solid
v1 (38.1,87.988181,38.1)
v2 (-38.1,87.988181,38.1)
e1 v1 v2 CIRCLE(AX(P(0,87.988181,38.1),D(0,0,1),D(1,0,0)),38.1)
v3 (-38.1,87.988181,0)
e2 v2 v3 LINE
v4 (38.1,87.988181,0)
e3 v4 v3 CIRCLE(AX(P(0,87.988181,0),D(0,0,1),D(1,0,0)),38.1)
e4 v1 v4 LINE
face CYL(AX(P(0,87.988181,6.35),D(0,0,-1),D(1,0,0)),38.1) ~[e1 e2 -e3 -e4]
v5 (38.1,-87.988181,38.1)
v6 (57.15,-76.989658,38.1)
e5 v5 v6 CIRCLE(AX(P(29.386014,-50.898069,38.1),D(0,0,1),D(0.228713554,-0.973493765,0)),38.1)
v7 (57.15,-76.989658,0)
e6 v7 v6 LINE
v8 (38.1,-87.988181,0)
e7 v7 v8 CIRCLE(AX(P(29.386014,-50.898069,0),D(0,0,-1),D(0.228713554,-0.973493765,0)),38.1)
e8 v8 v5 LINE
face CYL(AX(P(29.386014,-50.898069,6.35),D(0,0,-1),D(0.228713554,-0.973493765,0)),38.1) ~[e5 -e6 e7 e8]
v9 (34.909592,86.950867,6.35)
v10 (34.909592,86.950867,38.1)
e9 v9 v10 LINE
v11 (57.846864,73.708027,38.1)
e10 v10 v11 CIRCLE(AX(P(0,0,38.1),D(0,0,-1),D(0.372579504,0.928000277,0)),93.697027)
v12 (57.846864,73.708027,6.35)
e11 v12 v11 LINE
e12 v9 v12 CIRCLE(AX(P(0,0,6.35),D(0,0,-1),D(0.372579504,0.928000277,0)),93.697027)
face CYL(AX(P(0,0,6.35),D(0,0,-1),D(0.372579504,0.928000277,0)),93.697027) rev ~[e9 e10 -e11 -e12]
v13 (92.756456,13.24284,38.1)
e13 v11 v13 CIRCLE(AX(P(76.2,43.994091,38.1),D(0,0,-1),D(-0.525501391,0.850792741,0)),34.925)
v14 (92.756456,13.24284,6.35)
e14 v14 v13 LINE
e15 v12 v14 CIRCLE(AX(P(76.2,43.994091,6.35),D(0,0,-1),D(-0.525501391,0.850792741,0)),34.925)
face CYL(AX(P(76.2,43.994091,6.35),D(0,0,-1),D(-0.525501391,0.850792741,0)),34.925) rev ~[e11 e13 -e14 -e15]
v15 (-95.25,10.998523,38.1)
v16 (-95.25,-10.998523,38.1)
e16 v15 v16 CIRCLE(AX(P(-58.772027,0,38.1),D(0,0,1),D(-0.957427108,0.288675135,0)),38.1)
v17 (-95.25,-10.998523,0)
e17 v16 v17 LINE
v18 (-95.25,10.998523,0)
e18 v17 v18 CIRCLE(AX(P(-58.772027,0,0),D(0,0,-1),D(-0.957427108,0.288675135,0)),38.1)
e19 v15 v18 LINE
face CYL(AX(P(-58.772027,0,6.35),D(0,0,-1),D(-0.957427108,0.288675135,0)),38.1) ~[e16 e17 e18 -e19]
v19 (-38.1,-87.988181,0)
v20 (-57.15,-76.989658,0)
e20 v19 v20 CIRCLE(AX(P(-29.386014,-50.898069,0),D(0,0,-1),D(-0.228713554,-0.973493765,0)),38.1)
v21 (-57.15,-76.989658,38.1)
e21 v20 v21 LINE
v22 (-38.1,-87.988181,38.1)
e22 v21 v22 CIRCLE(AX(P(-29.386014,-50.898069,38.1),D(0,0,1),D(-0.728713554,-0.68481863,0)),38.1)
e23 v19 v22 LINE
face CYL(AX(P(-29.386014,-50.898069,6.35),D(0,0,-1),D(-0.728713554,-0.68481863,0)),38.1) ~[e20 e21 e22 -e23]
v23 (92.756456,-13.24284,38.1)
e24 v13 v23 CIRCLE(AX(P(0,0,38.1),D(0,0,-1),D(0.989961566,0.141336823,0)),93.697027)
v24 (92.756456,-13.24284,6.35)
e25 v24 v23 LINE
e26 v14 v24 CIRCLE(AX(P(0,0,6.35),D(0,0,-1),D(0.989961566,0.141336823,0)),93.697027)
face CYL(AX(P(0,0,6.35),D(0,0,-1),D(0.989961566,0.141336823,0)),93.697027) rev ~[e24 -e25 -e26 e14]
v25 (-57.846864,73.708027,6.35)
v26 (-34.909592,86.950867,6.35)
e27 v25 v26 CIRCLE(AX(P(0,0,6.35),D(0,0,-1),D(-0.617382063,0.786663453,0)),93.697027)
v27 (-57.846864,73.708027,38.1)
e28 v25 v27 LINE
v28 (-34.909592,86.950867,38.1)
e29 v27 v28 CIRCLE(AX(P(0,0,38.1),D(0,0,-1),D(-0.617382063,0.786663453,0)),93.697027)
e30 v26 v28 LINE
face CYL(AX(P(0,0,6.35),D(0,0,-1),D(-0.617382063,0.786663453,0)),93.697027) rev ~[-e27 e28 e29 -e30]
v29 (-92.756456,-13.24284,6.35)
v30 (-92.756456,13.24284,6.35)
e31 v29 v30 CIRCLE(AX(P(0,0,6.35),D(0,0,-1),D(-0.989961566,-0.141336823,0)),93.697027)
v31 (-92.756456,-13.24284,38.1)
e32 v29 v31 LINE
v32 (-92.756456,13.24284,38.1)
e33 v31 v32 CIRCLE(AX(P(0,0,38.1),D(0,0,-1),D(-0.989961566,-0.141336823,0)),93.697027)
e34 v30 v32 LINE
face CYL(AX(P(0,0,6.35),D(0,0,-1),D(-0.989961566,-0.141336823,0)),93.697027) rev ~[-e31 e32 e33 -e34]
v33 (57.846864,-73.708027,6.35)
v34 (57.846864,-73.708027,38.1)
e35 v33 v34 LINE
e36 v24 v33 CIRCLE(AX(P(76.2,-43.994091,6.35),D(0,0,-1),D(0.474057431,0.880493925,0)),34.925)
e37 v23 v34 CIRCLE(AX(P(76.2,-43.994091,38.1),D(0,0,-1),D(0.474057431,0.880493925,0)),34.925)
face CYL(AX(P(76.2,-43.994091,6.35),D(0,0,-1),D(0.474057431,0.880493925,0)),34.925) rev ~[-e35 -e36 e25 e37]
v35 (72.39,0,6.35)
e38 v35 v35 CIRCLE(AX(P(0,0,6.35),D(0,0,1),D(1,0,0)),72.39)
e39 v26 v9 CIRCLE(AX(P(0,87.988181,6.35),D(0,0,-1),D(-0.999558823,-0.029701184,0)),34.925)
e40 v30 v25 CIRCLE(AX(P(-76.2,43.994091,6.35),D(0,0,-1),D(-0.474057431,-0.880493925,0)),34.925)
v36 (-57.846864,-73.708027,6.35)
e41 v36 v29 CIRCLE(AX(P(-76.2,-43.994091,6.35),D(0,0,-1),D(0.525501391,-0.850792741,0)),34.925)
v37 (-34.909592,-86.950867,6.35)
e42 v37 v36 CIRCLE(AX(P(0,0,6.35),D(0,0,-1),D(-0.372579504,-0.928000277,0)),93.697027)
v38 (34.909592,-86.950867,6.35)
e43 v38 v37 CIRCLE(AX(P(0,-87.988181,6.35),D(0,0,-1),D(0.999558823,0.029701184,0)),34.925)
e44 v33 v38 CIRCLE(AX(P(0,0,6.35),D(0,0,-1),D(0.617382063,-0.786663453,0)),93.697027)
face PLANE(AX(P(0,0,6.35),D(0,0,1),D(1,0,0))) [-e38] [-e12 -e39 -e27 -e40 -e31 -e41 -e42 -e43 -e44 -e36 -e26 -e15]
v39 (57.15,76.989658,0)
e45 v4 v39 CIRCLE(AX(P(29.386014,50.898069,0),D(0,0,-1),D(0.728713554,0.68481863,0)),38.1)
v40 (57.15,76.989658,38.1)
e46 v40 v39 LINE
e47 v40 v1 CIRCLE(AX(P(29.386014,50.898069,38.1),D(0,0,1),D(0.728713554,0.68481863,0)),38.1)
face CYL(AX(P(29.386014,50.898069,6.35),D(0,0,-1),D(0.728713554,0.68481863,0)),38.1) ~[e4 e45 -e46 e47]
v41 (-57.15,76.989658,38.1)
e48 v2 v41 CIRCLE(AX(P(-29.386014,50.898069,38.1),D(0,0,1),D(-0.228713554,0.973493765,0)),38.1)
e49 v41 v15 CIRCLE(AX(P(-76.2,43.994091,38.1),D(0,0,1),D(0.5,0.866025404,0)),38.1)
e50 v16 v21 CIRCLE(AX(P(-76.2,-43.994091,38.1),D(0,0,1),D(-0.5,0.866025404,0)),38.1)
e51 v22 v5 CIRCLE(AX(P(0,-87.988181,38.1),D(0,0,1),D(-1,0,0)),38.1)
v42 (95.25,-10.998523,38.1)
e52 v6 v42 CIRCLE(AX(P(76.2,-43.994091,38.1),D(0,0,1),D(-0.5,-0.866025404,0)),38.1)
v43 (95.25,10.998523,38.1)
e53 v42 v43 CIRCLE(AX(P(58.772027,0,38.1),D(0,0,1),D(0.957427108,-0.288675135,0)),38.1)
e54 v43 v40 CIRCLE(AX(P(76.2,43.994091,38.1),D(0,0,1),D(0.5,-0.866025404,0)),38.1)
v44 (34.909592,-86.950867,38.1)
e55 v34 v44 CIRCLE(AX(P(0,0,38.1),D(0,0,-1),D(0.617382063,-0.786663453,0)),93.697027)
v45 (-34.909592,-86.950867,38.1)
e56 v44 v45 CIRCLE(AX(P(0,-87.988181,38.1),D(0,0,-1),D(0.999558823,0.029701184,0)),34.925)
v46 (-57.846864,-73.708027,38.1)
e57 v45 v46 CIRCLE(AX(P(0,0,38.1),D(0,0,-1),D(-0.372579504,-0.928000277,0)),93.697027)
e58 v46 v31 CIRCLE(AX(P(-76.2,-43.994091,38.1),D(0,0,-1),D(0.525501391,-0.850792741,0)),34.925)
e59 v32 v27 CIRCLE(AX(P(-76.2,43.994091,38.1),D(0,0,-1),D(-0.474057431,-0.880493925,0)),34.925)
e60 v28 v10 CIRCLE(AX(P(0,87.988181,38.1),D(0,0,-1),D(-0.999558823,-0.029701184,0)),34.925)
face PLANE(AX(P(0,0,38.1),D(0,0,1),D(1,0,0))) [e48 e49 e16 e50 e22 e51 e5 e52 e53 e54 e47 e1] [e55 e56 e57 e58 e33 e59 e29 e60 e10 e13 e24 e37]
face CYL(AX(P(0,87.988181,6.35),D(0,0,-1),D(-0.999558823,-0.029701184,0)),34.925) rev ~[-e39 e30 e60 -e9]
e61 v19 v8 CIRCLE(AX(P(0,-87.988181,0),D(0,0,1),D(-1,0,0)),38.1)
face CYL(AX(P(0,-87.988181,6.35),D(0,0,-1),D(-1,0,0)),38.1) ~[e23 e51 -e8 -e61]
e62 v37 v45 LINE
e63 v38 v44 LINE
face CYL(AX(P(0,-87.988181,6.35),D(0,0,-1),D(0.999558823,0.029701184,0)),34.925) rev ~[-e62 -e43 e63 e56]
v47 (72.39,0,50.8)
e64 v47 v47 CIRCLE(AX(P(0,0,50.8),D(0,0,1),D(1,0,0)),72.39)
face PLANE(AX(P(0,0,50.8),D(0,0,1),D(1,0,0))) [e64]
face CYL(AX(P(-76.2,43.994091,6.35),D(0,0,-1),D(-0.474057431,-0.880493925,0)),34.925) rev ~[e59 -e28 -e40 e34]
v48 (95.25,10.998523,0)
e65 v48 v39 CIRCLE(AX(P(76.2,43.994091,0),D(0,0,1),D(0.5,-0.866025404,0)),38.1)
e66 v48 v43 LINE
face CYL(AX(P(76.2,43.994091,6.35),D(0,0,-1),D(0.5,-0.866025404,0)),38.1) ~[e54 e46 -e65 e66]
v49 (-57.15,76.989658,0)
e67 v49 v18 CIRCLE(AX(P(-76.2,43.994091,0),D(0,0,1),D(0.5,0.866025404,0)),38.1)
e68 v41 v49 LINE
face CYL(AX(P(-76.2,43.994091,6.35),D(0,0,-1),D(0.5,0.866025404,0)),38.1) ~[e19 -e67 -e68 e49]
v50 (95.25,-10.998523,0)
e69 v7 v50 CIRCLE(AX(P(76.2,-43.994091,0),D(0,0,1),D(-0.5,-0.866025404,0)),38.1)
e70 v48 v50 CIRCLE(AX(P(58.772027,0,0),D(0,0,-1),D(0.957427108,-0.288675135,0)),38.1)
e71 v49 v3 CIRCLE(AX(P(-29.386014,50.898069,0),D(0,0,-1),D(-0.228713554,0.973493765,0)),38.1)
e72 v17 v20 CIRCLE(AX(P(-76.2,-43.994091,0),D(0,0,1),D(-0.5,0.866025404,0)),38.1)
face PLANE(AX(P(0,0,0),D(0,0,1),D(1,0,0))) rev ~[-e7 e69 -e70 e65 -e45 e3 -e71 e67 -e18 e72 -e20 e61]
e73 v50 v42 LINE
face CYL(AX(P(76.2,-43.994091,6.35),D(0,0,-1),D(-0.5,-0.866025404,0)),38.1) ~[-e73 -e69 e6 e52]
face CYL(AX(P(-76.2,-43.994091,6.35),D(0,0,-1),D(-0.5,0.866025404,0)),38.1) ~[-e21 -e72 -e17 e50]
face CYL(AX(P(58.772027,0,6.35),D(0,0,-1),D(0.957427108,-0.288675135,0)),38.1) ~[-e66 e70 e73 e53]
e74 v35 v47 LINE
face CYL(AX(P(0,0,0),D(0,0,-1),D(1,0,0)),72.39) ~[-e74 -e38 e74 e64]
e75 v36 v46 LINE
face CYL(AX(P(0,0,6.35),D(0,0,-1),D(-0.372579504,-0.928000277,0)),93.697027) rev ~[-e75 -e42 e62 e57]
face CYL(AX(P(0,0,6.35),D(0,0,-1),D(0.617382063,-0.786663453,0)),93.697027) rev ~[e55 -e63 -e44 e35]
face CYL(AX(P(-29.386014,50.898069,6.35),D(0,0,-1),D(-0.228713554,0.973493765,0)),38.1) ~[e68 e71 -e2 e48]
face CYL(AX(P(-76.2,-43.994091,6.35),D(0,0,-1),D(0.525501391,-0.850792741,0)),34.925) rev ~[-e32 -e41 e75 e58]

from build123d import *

# Parameters (mm, degrees)
F0_R        = 72.39
F1_DEPTH    = 6.35
F2_DEPTH    = 50.8
F3_T1_DEPTH = 69.85
F5_DEPTH    = 31.75


# Not quite as in the source:
# - a fillet or chamfer that OpenCascade refuses, or shapes differently, is made with other operations: its cross-section is extruded or revolved along the edge and cut away or added


with BuildPart() as f1:
    # F0 (on Top) → F1 (new body)
    with BuildSketch(Plane.XY):
        with BuildLine():
            Line((38.1, -87.9881810245), (50.8, -87.9881810245))
            Line((50.8, -87.9881810245), (57.15, -76.9896583964))
            ThreePointArc((57.15, -76.9896583964), (109.1955678842, -63.0440905122), (95.25, -10.9985226281))
            Line((95.25, -10.9985226281), (101.6, 0))
            Line((101.6, 0), (95.25, 10.9985226281))
            ThreePointArc((95.25, 10.9985226281), (109.1955678842, 63.0440905122), (57.15, 76.9896583964))
            Line((57.15, 76.9896583964), (50.8, 87.9881810245))
            Line((50.8, 87.9881810245), (38.1, 87.9881810245))
            ThreePointArc((38.1, 87.9881810245), (0, 126.0881810245), (-38.1, 87.9881810245))
            Line((-38.1, 87.9881810245), (-50.8, 87.9881810245))
            Line((-50.8, 87.9881810245), (-57.15, 76.9896583964))
            ThreePointArc((-57.15, 76.9896583964), (-109.1955678842, 63.0440905122), (-95.25, 10.9985226281))
            Line((-95.25, 10.9985226281), (-101.6, 0))
            Line((-101.6, 0), (-95.25, -10.9985226281))
            ThreePointArc((-95.25, -10.9985226281), (-109.1955678842, -63.0440905122), (-57.15, -76.9896583964))
            Line((-57.15, -76.9896583964), (-50.8, -87.9881810245))
            Line((-50.8, -87.9881810245), (-38.1, -87.9881810245))
            ThreePointArc((-38.1, -87.9881810245), (0, -126.0881810245), (38.1, -87.9881810245))
        make_face()
        Circle(F0_R, mode=Mode.SUBTRACT)
    extrude(amount=F1_DEPTH)

    # F0 (on Top) → F2 (join)
    with BuildSketch(Plane.XY):
        Circle(F0_R)
    extrude(amount=F2_DEPTH)

    # F3: fillet of radius 38.1 on 6 edges, made by hand

    # F3_s2 → F3_t1 (cut)
    with BuildSketch(Plane.XY.offset(-31.75)):
        with BuildLine():
            ThreePointArc((57.15, 76.9896583964), (48.4360135972, 83.8936364665), (38.1, 87.9881810245))
            Line((38.1, 87.9881810245), (50.8, 87.9881810245))
            Line((50.8, 87.9881810245), (57.15, 76.9896583964))
        make_face()
        with BuildLine():
            ThreePointArc((95.25, -10.9985226281), (96.8720271945, 0), (95.25, 10.9985226281))
            Line((95.25, 10.9985226281), (101.6, 0))
            Line((101.6, 0), (95.25, -10.9985226281))
        make_face()
        with BuildLine():
            ThreePointArc((38.1, -87.9881810245), (48.4360135972, -83.8936364665), (57.15, -76.9896583964))
            Line((57.15, -76.9896583964), (50.8, -87.9881810245))
            Line((50.8, -87.9881810245), (38.1, -87.9881810245))
        make_face()
        with BuildLine():
            ThreePointArc((-38.1, -87.9881810245), (-48.4360135972, -83.8936364665), (-57.15, -76.9896583964))
            Line((-57.15, -76.9896583964), (-50.8, -87.9881810245))
            Line((-50.8, -87.9881810245), (-38.1, -87.9881810245))
        make_face()
        with BuildLine():
            ThreePointArc((-95.25, 10.9985226281), (-96.8720271945, 0), (-95.25, -10.9985226281))
            Line((-95.25, -10.9985226281), (-101.6, 0))
            Line((-101.6, 0), (-95.25, 10.9985226281))
        make_face()
        with BuildLine():
            ThreePointArc((-38.1, 87.9881810245), (-48.4360135972, 83.8936364665), (-57.15, 76.9896583964))
            Line((-57.15, 76.9896583964), (-50.8, 87.9881810245))
            Line((-50.8, 87.9881810245), (-38.1, 87.9881810245))
        make_face()
    extrude(amount=F3_T1_DEPTH, mode=Mode.SUBTRACT)

    # F4 (on face) → F5 (join)
    with BuildSketch(Plane.XY.offset(6.35)):
        with BuildLine():
            ThreePointArc((-95.25, -10.9985226281), (-109.1955678842, -63.0440905122), (-57.15, -76.9896583964))
            ThreePointArc((-57.15, -76.9896583964), (-48.4360135972, -83.8936364665), (-38.1, -87.9881810245))
            ThreePointArc((-38.1, -87.9881810245), (0, -126.0881810245), (38.1, -87.9881810245))
            ThreePointArc((38.1, -87.9881810245), (48.4360135972, -83.8936364665), (57.15, -76.9896583964))
            ThreePointArc((57.15, -76.9896583964), (109.1955678842, -63.0440905122), (95.25, -10.9985226281))
            ThreePointArc((95.25, -10.9985226281), (96.8720271945, 0), (95.25, 10.9985226281))
            ThreePointArc((95.25, 10.9985226281), (109.1955678842, 63.0440905122), (57.15, 76.9896583964))
            ThreePointArc((57.15, 76.9896583964), (48.4360135972, 83.8936364665), (38.1, 87.9881810245))
            ThreePointArc((38.1, 87.9881810245), (0, 126.0881810245), (-38.1, 87.9881810245))
            ThreePointArc((-38.1, 87.9881810245), (-48.4360135972, 83.8936364665), (-57.15, 76.9896583964))
            ThreePointArc((-57.15, 76.9896583964), (-109.1955678842, 63.0440905122), (-95.25, 10.9985226281))
            ThreePointArc((-95.25, 10.9985226281), (-96.8720271945, 0), (-95.25, -10.9985226281))
        make_face()
        with BuildLine():
            ThreePointArc((-92.7564557809, 13.2428401804), (-106.4459372272, 61.4565905122), (-57.8468639049, 73.7080269811))
            ThreePointArc((-57.8468639049, 73.7080269811), (-46.8485135972, 81.1440058095), (-34.909591876, 86.9508671615))
            ThreePointArc((-34.909591876, 86.9508671615), (0, 122.9131810245), (34.909591876, 86.9508671615))
            ThreePointArc((34.909591876, 86.9508671615), (46.8485135972, 81.1440058095), (57.8468639049, 73.7080269811))
            ThreePointArc((57.8468639049, 73.7080269811), (106.4459372272, 61.4565905122), (92.7564557809, 13.2428401804))
            ThreePointArc((92.7564557809, 13.2428401804), (93.6970271945, 0), (92.7564557809, -13.2428401804))
            ThreePointArc((92.7564557809, -13.2428401804), (106.4459372272, -61.4565905122), (57.8468639049, -73.7080269811))
            ThreePointArc((57.8468639049, -73.7080269811), (46.8485135972, -81.1440058095), (34.909591876, -86.9508671615))
            ThreePointArc((34.909591876, -86.9508671615), (0, -122.9131810245), (-34.909591876, -86.9508671615))
            ThreePointArc((-34.909591876, -86.9508671615), (-46.8485135972, -81.1440058095), (-57.8468639049, -73.7080269811))
            ThreePointArc((-57.8468639049, -73.7080269811), (-106.4459372272, -61.4565905122), (-92.7564557809, -13.2428401804))
            ThreePointArc((-92.7564557809, -13.2428401804), (-93.6970271945, 0), (-92.7564557809, 13.2428401804))
        make_face(mode=Mode.SUBTRACT)
    extrude(amount=F5_DEPTH)


solid = f1.part
